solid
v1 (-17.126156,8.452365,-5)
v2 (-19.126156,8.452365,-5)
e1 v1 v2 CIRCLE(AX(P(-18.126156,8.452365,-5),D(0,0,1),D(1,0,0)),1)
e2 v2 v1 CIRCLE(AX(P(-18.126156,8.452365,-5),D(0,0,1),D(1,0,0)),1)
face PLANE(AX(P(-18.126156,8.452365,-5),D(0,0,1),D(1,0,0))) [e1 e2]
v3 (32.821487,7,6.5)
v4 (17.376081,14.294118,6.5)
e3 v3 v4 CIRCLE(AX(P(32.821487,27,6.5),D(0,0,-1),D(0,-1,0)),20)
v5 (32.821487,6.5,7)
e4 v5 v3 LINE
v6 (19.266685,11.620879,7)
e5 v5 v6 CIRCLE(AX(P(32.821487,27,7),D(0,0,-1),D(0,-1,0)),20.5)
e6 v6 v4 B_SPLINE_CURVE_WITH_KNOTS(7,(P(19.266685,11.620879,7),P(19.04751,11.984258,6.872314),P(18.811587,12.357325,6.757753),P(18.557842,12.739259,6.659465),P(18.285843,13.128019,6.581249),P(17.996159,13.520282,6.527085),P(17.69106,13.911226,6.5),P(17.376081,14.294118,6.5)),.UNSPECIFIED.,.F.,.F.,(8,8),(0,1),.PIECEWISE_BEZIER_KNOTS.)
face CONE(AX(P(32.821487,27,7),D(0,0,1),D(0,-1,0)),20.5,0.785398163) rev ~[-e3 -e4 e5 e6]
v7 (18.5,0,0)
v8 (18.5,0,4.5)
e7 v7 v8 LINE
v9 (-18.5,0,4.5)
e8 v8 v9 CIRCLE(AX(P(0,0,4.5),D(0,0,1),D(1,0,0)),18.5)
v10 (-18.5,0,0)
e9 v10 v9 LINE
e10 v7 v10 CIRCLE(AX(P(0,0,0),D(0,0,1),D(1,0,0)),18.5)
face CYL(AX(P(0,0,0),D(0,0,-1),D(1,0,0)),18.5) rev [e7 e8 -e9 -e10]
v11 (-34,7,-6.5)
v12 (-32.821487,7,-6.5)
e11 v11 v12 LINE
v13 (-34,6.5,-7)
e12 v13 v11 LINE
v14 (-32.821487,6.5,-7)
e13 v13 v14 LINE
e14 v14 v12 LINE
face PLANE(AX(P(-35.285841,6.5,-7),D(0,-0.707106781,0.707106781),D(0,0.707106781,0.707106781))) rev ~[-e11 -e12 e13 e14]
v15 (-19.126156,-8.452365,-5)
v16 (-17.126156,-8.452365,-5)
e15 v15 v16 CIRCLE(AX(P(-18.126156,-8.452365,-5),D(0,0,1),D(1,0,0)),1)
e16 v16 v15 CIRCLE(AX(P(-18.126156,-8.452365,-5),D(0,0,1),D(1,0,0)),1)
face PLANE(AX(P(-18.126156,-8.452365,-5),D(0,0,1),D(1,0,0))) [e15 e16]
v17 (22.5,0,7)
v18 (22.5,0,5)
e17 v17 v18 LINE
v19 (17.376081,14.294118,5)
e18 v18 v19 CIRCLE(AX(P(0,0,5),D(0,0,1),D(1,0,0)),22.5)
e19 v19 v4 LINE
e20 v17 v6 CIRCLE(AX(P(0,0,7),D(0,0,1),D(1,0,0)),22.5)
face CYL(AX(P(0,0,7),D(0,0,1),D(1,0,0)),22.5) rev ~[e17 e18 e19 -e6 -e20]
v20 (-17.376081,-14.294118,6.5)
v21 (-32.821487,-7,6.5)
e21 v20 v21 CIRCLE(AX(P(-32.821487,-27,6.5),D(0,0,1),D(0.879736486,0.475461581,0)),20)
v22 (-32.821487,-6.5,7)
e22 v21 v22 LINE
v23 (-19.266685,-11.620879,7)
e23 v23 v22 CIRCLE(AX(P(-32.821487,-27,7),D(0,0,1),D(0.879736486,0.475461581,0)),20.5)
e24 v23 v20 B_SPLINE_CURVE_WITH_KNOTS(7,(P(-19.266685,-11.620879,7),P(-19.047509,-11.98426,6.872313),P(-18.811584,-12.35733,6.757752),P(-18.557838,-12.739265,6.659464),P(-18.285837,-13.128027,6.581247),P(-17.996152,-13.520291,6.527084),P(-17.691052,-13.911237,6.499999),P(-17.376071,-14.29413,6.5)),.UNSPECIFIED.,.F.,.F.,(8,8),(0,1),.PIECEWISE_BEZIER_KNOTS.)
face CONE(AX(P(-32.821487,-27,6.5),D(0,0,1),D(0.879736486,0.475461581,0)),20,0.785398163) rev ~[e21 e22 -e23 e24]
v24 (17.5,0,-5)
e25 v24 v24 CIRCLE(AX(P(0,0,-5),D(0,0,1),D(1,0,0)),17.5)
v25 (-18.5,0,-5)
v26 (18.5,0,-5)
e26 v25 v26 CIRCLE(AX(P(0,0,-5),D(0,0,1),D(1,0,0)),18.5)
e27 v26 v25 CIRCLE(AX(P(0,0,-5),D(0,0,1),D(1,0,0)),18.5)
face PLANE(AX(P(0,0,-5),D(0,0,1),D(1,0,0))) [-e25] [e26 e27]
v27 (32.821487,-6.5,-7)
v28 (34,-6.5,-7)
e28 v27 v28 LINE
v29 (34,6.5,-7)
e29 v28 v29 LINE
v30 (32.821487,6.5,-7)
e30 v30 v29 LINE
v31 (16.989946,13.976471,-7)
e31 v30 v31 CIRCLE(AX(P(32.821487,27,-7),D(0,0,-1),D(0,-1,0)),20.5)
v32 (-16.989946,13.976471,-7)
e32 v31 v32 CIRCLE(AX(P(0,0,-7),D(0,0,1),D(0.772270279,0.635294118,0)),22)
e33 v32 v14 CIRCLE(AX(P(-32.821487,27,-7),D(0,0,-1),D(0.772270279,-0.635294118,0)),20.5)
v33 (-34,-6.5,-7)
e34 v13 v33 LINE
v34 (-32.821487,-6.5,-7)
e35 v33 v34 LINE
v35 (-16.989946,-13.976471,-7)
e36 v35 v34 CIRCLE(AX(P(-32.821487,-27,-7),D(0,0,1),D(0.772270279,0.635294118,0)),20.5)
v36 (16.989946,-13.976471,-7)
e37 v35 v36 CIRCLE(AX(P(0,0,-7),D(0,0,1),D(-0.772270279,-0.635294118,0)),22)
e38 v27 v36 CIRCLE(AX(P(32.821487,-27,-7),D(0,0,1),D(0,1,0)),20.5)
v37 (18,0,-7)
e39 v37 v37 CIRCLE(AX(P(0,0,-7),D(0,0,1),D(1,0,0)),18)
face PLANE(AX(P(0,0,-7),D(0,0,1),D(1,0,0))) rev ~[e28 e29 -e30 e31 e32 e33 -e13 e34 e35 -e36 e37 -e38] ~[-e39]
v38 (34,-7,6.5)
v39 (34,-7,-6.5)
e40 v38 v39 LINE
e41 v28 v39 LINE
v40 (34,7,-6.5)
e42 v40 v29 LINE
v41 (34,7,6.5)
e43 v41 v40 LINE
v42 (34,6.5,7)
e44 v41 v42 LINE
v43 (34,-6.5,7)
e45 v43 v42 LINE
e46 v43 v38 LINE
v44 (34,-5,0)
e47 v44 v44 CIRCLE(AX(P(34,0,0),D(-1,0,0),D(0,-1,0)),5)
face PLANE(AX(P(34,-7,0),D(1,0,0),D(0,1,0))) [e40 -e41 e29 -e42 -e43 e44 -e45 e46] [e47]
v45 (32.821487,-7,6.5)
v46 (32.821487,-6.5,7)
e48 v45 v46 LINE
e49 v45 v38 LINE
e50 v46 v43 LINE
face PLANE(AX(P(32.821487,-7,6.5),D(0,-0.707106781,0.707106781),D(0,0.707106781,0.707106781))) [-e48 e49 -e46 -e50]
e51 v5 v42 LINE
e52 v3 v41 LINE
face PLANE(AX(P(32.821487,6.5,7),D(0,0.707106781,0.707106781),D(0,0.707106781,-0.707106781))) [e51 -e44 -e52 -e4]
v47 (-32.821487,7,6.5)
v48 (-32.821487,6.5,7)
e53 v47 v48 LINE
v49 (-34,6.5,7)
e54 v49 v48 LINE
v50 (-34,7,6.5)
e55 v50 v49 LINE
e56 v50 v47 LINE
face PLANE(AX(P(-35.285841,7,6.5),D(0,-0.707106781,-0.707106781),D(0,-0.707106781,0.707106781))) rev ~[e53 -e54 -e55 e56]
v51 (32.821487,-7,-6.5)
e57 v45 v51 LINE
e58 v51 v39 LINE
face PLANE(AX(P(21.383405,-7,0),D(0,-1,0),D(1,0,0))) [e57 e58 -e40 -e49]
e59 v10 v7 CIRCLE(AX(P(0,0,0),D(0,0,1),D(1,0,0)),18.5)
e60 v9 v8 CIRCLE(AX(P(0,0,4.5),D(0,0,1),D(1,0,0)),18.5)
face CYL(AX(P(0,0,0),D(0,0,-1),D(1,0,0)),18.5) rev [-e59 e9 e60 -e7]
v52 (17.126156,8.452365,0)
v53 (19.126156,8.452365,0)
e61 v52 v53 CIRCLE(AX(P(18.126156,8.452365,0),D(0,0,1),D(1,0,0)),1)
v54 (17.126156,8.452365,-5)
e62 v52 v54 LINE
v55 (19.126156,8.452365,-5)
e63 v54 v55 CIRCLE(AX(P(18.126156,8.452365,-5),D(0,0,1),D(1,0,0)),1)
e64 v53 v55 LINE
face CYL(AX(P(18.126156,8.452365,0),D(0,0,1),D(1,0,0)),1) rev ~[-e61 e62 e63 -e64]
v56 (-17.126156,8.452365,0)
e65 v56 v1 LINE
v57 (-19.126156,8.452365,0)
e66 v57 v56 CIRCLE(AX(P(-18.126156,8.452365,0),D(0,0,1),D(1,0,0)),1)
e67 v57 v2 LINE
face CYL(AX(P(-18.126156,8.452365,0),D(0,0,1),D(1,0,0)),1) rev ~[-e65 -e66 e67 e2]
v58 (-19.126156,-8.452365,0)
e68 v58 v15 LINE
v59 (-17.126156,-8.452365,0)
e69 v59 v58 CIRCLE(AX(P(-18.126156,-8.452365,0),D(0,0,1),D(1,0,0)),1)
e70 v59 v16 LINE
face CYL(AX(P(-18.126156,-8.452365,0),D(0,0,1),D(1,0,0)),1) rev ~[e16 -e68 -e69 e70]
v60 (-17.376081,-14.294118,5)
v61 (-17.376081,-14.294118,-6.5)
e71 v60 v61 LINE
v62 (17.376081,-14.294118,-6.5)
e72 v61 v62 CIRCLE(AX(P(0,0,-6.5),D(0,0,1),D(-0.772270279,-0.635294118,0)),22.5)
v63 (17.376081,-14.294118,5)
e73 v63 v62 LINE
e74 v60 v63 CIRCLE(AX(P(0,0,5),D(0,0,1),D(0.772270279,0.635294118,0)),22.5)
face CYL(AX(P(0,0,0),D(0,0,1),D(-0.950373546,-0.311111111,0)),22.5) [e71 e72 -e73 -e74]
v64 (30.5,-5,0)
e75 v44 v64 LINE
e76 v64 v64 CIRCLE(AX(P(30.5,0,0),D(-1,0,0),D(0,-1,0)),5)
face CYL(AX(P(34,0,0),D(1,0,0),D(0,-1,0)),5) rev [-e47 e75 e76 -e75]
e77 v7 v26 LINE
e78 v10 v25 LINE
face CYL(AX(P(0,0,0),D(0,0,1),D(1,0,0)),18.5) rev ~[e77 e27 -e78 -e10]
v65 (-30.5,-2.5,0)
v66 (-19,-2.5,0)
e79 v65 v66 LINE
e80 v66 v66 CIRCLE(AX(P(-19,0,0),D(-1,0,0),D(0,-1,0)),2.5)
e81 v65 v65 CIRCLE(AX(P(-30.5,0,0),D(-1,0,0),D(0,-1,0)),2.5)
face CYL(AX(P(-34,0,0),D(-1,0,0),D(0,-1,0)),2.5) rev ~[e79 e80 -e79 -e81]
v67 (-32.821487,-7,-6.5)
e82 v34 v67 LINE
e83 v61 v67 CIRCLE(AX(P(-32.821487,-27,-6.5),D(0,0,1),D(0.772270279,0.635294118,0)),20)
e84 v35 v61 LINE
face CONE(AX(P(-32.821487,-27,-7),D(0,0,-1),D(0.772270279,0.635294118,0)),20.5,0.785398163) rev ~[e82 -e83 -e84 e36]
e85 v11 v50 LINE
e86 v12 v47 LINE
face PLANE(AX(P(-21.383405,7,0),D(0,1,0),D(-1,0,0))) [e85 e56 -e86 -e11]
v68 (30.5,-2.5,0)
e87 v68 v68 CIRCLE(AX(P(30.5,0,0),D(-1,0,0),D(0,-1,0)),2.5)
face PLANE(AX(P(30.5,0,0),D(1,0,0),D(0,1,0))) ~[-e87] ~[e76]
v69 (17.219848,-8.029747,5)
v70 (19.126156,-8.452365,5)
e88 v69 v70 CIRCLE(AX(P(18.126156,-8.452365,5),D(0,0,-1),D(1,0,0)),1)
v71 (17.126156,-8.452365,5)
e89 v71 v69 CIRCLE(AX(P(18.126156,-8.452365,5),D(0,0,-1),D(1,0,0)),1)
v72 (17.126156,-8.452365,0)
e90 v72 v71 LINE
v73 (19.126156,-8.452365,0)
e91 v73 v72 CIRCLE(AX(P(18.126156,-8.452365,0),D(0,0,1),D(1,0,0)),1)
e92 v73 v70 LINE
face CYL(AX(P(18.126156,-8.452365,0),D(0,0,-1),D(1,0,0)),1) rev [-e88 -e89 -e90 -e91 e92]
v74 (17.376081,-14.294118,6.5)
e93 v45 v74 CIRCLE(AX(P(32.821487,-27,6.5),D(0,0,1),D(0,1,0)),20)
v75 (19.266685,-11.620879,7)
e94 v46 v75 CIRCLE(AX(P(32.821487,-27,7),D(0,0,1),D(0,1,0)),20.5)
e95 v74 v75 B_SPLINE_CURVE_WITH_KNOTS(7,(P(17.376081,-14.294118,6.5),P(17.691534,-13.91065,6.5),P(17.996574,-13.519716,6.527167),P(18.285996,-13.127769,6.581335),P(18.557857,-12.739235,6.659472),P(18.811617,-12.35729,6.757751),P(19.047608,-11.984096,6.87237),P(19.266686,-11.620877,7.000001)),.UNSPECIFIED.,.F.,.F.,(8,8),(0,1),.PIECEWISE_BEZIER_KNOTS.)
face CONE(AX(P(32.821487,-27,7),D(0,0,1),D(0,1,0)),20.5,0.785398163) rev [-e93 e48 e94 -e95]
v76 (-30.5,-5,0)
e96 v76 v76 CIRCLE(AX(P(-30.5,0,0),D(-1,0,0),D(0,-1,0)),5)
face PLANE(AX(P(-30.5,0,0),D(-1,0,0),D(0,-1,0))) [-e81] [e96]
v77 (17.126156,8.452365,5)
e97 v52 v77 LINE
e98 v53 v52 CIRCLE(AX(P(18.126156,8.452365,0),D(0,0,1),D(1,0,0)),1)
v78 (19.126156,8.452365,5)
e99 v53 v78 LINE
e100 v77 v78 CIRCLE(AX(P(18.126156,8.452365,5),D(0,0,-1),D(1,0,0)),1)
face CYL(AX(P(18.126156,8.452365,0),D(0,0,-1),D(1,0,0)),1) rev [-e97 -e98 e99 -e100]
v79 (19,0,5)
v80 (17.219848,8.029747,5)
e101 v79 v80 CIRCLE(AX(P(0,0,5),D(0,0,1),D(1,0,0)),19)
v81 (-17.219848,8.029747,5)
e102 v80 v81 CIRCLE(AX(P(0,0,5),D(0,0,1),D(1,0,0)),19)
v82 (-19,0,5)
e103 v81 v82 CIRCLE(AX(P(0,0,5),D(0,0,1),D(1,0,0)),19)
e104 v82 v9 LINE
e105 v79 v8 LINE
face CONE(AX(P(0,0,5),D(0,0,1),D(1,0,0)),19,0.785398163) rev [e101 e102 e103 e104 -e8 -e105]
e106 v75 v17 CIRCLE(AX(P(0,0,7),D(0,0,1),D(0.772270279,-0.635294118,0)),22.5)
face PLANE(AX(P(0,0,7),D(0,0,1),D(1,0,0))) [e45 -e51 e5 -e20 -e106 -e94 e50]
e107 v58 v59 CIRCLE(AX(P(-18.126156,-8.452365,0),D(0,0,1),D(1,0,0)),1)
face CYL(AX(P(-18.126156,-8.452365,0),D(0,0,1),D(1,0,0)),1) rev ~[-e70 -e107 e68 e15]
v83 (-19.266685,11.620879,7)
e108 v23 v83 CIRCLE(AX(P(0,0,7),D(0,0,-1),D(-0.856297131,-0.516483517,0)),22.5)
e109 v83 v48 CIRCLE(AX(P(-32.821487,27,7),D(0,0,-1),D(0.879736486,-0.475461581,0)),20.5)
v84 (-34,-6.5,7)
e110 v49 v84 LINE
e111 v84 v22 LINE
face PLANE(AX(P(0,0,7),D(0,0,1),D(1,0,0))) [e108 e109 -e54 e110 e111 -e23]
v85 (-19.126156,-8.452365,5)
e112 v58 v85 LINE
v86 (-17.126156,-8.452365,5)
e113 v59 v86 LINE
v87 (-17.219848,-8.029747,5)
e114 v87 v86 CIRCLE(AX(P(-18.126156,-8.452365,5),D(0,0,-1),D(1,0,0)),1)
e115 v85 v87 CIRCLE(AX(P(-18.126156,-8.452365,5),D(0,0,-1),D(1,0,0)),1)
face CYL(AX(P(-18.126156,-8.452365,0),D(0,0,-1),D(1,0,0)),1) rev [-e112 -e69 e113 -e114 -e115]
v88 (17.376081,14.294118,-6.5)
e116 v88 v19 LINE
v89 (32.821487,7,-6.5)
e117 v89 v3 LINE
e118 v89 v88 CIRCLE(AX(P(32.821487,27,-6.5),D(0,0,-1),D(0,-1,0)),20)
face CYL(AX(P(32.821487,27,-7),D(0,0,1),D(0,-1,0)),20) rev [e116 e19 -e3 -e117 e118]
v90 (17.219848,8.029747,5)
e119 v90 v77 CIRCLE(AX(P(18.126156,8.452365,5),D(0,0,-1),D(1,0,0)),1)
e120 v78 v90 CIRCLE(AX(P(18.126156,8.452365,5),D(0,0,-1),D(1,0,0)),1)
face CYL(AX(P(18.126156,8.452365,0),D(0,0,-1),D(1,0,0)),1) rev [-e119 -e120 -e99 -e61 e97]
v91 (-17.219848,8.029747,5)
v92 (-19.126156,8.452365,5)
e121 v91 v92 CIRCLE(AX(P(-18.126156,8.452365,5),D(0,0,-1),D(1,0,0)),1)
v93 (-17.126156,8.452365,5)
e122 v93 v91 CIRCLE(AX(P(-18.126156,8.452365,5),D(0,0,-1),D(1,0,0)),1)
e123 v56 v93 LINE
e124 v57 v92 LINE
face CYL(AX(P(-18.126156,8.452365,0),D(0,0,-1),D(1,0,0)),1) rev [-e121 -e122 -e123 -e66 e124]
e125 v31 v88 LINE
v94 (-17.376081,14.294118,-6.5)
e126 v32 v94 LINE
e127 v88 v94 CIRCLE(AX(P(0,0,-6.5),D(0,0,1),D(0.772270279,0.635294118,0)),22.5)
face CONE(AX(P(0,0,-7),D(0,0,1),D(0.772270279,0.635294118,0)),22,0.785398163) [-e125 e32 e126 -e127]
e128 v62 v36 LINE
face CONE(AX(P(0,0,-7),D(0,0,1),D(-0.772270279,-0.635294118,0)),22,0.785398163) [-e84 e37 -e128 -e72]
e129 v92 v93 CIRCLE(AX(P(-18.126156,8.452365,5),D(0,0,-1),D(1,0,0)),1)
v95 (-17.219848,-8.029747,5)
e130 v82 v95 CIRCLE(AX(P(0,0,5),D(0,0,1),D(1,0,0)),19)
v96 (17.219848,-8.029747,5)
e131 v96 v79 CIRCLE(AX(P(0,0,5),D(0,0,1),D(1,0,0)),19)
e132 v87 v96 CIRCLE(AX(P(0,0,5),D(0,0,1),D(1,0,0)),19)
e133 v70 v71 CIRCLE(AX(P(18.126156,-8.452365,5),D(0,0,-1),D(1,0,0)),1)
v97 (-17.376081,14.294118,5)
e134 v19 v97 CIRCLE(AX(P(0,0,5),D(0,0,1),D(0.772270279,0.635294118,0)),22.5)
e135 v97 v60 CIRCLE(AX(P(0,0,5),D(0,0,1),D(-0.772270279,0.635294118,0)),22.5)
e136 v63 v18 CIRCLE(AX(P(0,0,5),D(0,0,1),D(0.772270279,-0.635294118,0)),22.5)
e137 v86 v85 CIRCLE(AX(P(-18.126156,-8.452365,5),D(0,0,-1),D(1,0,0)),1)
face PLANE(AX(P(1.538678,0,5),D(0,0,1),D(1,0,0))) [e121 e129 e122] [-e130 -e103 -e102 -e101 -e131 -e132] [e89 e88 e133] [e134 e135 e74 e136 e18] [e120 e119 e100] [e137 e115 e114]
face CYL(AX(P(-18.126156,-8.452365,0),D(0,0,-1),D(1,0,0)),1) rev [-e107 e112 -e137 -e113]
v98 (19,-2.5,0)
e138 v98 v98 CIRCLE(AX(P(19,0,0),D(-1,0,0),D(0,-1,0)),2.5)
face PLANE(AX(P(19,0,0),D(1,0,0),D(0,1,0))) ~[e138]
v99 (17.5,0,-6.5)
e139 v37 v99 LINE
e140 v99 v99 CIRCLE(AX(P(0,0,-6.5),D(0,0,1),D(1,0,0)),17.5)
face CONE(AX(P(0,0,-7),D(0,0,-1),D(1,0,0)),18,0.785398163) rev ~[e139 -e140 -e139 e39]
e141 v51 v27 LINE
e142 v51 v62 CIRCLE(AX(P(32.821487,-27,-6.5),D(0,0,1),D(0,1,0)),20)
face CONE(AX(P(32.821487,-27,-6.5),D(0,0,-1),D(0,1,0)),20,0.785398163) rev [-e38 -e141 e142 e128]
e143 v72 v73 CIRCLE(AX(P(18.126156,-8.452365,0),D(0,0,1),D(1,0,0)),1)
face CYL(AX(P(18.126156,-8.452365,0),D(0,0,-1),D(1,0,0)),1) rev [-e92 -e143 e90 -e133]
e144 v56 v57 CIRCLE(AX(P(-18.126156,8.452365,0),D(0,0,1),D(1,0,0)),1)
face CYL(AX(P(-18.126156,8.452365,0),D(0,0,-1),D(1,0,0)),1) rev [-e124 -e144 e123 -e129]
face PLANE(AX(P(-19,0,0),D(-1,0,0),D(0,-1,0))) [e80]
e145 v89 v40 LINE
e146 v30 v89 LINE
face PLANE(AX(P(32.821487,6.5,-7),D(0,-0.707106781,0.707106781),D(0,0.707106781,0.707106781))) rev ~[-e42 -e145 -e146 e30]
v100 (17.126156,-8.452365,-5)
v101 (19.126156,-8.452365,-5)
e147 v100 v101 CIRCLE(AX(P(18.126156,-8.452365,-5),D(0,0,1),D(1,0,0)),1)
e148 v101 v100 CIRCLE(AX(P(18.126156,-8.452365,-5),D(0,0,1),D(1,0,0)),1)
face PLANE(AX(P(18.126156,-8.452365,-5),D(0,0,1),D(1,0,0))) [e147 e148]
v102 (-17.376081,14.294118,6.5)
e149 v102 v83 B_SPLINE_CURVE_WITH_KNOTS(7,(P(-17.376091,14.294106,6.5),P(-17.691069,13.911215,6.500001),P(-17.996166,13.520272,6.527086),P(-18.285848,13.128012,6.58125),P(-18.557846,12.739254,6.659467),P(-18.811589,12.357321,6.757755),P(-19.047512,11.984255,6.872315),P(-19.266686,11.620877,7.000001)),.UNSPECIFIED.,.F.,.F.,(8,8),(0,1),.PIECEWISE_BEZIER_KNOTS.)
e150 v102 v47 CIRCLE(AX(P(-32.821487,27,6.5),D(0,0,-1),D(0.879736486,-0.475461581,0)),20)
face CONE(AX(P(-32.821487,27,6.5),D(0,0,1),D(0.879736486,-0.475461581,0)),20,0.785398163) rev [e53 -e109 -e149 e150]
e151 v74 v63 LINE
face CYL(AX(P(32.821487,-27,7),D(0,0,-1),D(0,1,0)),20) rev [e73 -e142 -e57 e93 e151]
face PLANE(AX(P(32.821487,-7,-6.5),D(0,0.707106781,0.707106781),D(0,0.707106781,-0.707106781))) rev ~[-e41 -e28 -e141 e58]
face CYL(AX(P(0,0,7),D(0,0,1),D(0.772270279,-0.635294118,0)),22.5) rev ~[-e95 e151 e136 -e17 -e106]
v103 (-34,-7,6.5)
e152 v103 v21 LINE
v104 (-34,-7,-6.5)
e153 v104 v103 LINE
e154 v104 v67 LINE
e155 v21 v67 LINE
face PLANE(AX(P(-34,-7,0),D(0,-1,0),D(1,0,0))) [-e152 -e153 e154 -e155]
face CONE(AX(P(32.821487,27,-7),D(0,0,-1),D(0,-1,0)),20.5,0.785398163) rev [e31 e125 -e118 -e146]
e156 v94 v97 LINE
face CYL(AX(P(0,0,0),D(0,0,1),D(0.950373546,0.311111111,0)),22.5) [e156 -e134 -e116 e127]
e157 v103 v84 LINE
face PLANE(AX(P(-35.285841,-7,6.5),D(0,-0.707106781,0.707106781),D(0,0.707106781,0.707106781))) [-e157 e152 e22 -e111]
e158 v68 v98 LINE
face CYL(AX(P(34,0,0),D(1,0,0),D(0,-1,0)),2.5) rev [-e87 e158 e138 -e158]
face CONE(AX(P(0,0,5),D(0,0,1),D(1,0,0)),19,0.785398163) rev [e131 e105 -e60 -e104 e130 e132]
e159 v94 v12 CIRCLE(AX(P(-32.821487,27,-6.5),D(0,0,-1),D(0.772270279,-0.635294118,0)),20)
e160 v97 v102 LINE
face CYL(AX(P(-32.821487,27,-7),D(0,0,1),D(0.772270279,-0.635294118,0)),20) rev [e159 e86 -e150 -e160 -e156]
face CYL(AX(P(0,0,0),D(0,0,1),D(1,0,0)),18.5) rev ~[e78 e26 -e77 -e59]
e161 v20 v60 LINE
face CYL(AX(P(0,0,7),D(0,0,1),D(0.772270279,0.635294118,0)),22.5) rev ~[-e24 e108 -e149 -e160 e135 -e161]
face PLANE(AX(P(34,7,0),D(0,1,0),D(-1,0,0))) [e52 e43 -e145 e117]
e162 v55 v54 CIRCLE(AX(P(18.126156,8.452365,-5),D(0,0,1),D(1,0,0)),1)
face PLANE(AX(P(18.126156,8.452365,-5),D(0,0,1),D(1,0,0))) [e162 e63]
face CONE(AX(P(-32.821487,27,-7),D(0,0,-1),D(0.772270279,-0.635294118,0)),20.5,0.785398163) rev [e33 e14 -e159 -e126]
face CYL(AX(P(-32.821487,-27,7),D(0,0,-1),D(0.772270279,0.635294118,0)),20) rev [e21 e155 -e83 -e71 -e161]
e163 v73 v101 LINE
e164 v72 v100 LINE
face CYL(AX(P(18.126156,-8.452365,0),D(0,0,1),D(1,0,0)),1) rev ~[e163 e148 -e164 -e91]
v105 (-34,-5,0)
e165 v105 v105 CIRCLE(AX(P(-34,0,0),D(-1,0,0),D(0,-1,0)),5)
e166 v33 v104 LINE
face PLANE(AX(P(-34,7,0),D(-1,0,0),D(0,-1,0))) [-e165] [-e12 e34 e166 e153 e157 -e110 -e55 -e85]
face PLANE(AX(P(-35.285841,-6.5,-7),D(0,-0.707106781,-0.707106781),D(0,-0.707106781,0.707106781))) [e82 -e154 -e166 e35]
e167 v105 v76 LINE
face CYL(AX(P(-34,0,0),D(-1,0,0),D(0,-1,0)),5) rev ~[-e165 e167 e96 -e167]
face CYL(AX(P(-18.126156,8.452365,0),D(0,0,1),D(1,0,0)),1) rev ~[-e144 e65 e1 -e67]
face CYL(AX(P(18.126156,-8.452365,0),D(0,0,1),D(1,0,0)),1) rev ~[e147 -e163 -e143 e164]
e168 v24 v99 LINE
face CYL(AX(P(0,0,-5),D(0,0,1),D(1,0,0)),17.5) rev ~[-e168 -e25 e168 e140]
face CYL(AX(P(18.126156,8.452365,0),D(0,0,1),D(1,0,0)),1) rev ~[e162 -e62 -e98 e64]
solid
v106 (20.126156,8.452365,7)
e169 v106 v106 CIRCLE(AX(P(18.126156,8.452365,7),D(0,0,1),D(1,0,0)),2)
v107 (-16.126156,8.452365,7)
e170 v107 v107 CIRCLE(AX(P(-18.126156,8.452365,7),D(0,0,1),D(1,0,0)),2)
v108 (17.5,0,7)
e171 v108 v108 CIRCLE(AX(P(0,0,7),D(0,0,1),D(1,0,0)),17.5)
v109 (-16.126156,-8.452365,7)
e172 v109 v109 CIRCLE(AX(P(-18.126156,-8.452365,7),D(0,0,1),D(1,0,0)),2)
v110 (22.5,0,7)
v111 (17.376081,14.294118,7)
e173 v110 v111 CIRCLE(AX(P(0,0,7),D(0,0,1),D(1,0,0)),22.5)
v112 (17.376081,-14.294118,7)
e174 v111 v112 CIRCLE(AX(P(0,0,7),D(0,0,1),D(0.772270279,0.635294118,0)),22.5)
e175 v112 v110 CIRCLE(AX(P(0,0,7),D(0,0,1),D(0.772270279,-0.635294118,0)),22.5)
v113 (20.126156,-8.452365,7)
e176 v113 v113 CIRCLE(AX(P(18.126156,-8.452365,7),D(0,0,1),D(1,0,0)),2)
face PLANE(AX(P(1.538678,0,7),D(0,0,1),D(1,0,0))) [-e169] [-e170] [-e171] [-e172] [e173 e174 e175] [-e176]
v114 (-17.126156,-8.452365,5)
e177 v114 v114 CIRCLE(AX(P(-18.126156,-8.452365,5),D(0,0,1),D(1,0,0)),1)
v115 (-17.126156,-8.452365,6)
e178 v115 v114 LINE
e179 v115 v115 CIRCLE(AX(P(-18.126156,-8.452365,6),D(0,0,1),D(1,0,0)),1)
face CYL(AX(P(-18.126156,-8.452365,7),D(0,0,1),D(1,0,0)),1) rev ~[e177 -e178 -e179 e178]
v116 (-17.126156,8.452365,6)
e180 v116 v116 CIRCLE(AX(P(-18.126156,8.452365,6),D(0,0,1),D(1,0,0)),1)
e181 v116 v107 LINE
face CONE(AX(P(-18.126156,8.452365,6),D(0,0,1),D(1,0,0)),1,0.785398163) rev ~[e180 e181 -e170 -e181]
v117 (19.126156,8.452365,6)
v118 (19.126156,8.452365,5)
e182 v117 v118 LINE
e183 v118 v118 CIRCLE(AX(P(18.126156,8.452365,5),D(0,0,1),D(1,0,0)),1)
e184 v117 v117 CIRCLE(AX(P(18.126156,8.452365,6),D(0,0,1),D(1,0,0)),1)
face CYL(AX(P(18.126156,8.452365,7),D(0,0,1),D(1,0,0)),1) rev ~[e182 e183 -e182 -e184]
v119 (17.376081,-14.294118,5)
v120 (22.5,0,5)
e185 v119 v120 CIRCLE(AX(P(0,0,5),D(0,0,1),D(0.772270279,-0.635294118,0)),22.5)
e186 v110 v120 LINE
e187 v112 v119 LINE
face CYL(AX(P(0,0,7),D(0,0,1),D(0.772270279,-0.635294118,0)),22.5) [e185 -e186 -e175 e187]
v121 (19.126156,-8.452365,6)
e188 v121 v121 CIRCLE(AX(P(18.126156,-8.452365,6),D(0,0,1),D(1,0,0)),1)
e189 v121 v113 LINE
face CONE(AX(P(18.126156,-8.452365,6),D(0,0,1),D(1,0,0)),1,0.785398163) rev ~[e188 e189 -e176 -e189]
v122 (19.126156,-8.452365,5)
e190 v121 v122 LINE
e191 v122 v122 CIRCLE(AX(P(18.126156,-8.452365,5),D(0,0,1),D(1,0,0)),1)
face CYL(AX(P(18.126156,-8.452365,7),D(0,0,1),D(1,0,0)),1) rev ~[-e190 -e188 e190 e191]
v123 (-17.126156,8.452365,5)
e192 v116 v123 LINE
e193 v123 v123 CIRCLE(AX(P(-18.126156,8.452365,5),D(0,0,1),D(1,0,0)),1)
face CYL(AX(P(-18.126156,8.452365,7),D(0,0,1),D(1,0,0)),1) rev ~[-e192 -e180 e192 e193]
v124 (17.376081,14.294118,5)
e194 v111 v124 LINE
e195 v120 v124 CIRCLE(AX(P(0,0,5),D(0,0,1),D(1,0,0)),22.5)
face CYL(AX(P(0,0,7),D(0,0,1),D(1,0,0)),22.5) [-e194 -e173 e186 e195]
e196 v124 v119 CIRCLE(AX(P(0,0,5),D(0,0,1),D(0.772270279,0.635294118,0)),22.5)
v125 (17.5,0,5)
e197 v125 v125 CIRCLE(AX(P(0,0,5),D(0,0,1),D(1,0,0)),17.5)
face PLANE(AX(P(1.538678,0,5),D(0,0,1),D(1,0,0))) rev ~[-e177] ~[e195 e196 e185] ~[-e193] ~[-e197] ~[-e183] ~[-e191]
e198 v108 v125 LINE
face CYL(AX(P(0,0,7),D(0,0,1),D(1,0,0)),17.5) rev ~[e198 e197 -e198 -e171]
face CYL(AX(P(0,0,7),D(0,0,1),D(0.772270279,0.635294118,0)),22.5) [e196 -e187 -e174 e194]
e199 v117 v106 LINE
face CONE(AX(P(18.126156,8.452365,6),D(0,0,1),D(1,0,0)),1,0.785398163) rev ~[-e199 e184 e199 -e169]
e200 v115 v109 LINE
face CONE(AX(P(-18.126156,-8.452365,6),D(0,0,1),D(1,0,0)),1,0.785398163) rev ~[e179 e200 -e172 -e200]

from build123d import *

# Parameters (mm, degrees)
F0_R          = 1
F0_R_2        = 18.5
F1_DEPTH      = 7
F1_DEPTH_BACK = 7
F2_START      = -5
F0_R_3        = 17.5
F2_DEPTH      = 2
F3_R          = 20
F4_R          = 1
F4_R_2        = 18.5
F5_DEPTH      = 2
F4_R_3        = 17.5
F6_DEPTH      = 2
F7_T1_DEPTH   = 2.4643546294
F7_T3_DEPTH   = 2.4643546294
F7_T6_ANGLE   = 61.6105922117
F7_T8_ANGLE   = 61.6105922117
F7_T10_ANGLE  = 61.6105922117
F7_T12_ANGLE  = 61.6105922117
F7_T14_ANGLE  = 50.5581979624
F7_T16_ANGLE  = 101.1163959248
F7_T22_ANGLE  = 50.5581979624
F7_T24_ANGLE  = 50.5581979624
F7_T26_ANGLE  = 101.1163959248
F7_T28_ANGLE  = 50.5581979624
F8_SIZE       = 1
F9_R          = 5
F9_R_2        = 2.5
F10_DEPTH     = 3.5
F11_DEPTH     = 15


# Not quite as in the source:
# - a fillet or chamfer that OpenCascade refuses, or shapes differently, is made with other operations: its cross-section is extruded or revolved along the edge and cut away or added


with BuildPart() as f1:
    # F0 (on Top) → F1 (new body, two sides)
    with BuildSketch(Plane.XY) as f1_sk:
        with BuildLine():
            Line((34, 7), (21.3834047803, 7))
            ThreePointArc((21.3834047803, 7), (0, 22.5), (-21.3834047803, 7))
            Line((-21.3834047803, 7), (-34, 7))
            Line((-34, 7), (-34, -7))
            Line((-34, -7), (-21.3834047803, -7))
            ThreePointArc((-21.3834047803, -7), (0, -22.5), (21.3834047803, -7))
            Line((21.3834047803, -7), (34, -7))
            Line((34, -7), (34, 7))
        make_face()
        with Locations((-18.1261557407, -8.4523652348)):
            Circle(F0_R, mode=Mode.SUBTRACT)
        with Locations((18.1261557407, -8.4523652348)):
            Circle(F0_R, mode=Mode.SUBTRACT)
        with Locations((-18.1261557407, 8.4523652348)):
            Circle(F0_R, mode=Mode.SUBTRACT)
        Circle(F0_R_2, mode=Mode.SUBTRACT)
        with Locations((18.1261557407, 8.4523652348)):
            Circle(F0_R, mode=Mode.SUBTRACT)
    extrude(amount=F1_DEPTH)
    extrude(f1_sk.sketch, amount=-F1_DEPTH_BACK)

    # F0 (on Top) → F2 (join)
    with BuildSketch(Plane.XY.offset(F2_START)):
        Circle(F0_R_2)
        Circle(F0_R_3, mode=Mode.SUBTRACT)
        with Locations((18.1261557407, 8.4523652348)):
            Circle(F0_R)
        with Locations((18.1261557407, -8.4523652348)):
            Circle(F0_R)
        with Locations((-18.1261557407, -8.4523652348)):
            Circle(F0_R)
        with Locations((-18.1261557407, 8.4523652348)):
            Circle(F0_R)
    extrude(amount=-F2_DEPTH)

    # F3
    f3_edges = [f1.edges().sort_by_distance(p)[0] for p in [
        (21.383405, 7, 0),
        (21.383405, -7, 0),
        (-21.383405, -7, 0),
        (-21.383405, 7, 0),
    ]]
    fillet(f3_edges, radius=F3_R)

    # F4 (on face) → F5 (cut)
    with BuildSketch(Plane.XY.offset(7)):
        with BuildLine():
            ThreePointArc((17.3760812812, -14.2941176471), (21.1803190348, -7.5923702219), (22.5, 0))
            ThreePointArc((22.5, 0), (21.1803190348, 7.5923702219), (17.3760812812, 14.2941176471))
            ThreePointArc((17.3760812812, 14.2941176471), (0, 22.5), (-17.3760812812, 14.2941176471))
            ThreePointArc((-17.3760812812, 14.2941176471), (-22.5, 0), (-17.3760812812, -14.2941176471))
            ThreePointArc((-17.3760812812, -14.2941176471), (0, -22.5), (17.3760812812, -14.2941176471))
        make_face()
        with Locations((-18.1261557407, -8.4523652348)):
            Circle(F4_R, mode=Mode.SUBTRACT)
        with Locations((18.1261557407, -8.4523652348)):
            Circle(F4_R, mode=Mode.SUBTRACT)
        with Locations((-18.1261557407, 8.4523652348)):
            Circle(F4_R, mode=Mode.SUBTRACT)
        Circle(F4_R_2, mode=Mode.SUBTRACT)
        with Locations((18.1261557407, 8.4523652348)):
            Circle(F4_R, mode=Mode.SUBTRACT)
        with Locations((18.1261557407, -8.4523652348)):
            Circle(F4_R)
        with Locations((18.1261557407, 8.4523652348)):
            Circle(F4_R)
        with Locations((-18.1261557407, 8.4523652348)):
            Circle(F4_R)
        with Locations((-18.1261557407, -8.4523652348)):
            Circle(F4_R)
    extrude(amount=-F5_DEPTH, mode=Mode.SUBTRACT)

    # F7: chamfer of 0.5 on 8 edges, made by hand

    # F7_s2 → F7_t1 (cut)
    with BuildSketch(Plane.YZ.offset(-35.285841494)):
        Polygon((6.5, -7), (7, -6.5), (7, -7), align=None)
        Polygon((-6.5, -7), (-7, -6.5), (-7, -7), align=None)
        Polygon((7, 6.5), (6.5, 7), (7, 7), align=None)
        Polygon((-7, 6.5), (-6.5, 7), (-7, 7), align=None)
    extrude(amount=F7_T1_DEPTH, mode=Mode.SUBTRACT)

    # F7_s4 → F7_t3 (cut)
    with BuildSketch(Plane.YZ.offset(32.8214868646)):
        Polygon((6.5, -7), (7, -6.5), (7, -7), align=None)
        Polygon((-7, -6.5), (-6.5, -7), (-7, -7), align=None)
        Polygon((6.5, 7), (7, 6.5), (7, 7), align=None)
        Polygon((-7, 6.5), (-6.5, 7), (-7, 7), align=None)
    extrude(amount=F7_T3_DEPTH, mode=Mode.SUBTRACT)

    # F7_s5 → F7_t6 (revolve, cut)
    with BuildSketch(Plane(origin=(3.873837059, -7.1676786017, 0), x_dir=(0, 0, 1), z_dir=(0.4754615812, -0.879736486, 0))):
        Polygon((6.5, 21.7117222121), (7, 21.2117222121), (7, 21.7117222121), align=None)
    revolve(axis=Axis((-32.8214868646, -27, 7), (0, 0, 1)), revolution_arc=F7_T6_ANGLE, mode=Mode.SUBTRACT)

    # F7_s7 → F7_t8 (revolve, cut)
    with BuildSketch(Plane(origin=(3.873837059, 7.1676786017, 0), x_dir=(0, 0, 1), z_dir=(0.4754615812, 0.879736486, 0))):
        Polygon((6.5, -21.7117222121), (7, -21.2117222121), (7, -21.7117222121), align=None)
    revolve(axis=Axis((-32.8214868646, 27, 7), (0, 0, -1)), revolution_arc=F7_T8_ANGLE, mode=Mode.SUBTRACT)

    # F7_s9 → F7_t10 (revolve, cut)
    with BuildSketch(Plane.YZ.offset(32.8214868646)):
        Polygon((-6.5, 7), (-7, 6.5), (-7, 7), align=None)
    revolve(axis=Axis((32.8214868646, -27, 7), (0, 0, 1)), revolution_arc=F7_T10_ANGLE, mode=Mode.SUBTRACT)

    # F7_s11 → F7_t12 (revolve, cut)
    with BuildSketch(Plane.YZ.offset(32.8214868646)):
        Polygon((6.5, 7), (7, 6.5), (7, 7), align=None)
    revolve(axis=Axis((32.8214868646, 27, 7), (0, 0, -1)), revolution_arc=F7_T12_ANGLE, mode=Mode.SUBTRACT)

    # F7_s13 → F7_t14 (revolve, cut)
    with BuildSketch(Plane.YZ.offset(32.8214868646)):
        Polygon((-7, -6.5), (-6.5, -7), (-7, -7), align=None)
    revolve(axis=Axis((32.8214868646, -27, -7), (0, 0, 1)), revolution_arc=F7_T14_ANGLE, mode=Mode.SUBTRACT)

    # F7_s15 → F7_t16 (revolve, cut)
    with BuildSketch(Plane(origin=(0, 0, 0), x_dir=(0, 0, 1), z_dir=(0.6352941176, -0.7722702792, 0))):
        Polygon((-7, -22), (-6.5, -22.5), (-7, -22.5), align=None)
    revolve(axis=Axis((0, 0, -7), (0, 0, 1)), revolution_arc=F7_T16_ANGLE, mode=Mode.SUBTRACT)

    # F7_s17 → F7_t18 (revolve, cut)
    with BuildSketch(Plane.XZ):
        Polygon((18, -7), (17.5, -6.5), (17.5, -7), align=None)
    revolve(axis=Axis((0, 0, -7), (0, 0, 1)), mode=Mode.SUBTRACT)

    # F7_s19 → F7_t20 (revolve, cut)
    with BuildSketch(Plane.XZ):
        Polygon((19, 5), (18.5, 4.5), (18.5, 5), align=None)
    revolve(axis=Axis((0, 0, 5), (0, 0, 1)), mode=Mode.SUBTRACT)

    # F7_s21 → F7_t22 (revolve, cut)
    with BuildSketch(Plane.YZ.offset(32.8214868646)):
        Polygon((6.5, -7), (7, -6.5), (7, -7), align=None)
    revolve(axis=Axis((32.8214868646, 27, -7), (0, 0, -1)), revolution_arc=F7_T22_ANGLE, mode=Mode.SUBTRACT)

    # F7_s23 → F7_t24 (revolve, cut)
    with BuildSketch(Plane(origin=(0, 0, 0), x_dir=(0, 0, 1), z_dir=(0.6352941176, 0.7722702792, 0))):
        Polygon((-7, -22), (-6.5, -22.5), (-7, -22.5), align=None)
    revolve(axis=Axis((-32.8214868646, 27, -7), (0, 0, -1)), revolution_arc=F7_T24_ANGLE, mode=Mode.SUBTRACT)

    # F7_s25 → F7_t26 (revolve, cut)
    with BuildSketch(Plane(origin=(0, 0, 0), x_dir=(0, 0, 1), z_dir=(-0.6352941176, 0.7722702792, 0))):
        Polygon((-7, -22), (-6.5, -22.5), (-7, -22.5), align=None)
    revolve(axis=Axis((0, 0, -7), (0, 0, 1)), revolution_arc=F7_T26_ANGLE, mode=Mode.SUBTRACT)

    # F7_s27 → F7_t28 (revolve, cut)
    with BuildSketch(Plane(origin=(0, 0, 0), x_dir=(0, 0, 1), z_dir=(0.6352941176, -0.7722702792, 0))):
        Polygon((-7, 22), (-6.5, 22.5), (-7, 22.5), align=None)
    revolve(axis=Axis((-32.8214868646, -27, -7), (0, 0, 1)), revolution_arc=F7_T28_ANGLE, mode=Mode.SUBTRACT)

    # F9 (on face) → F10 (cut)
    with BuildSketch(Plane(origin=(-34, 0, 0), x_dir=(0, -1, 0), z_dir=(-1, 0, 0))):
        Circle(F9_R)
        Circle(F9_R_2, mode=Mode.SUBTRACT)
        Circle(F9_R_2)
    extrude(amount=-F10_DEPTH, mode=Mode.SUBTRACT)

    # F9 (on face) → F11 (cut)
    with BuildSketch(Plane(origin=(-34, 0, 0), x_dir=(0, -1, 0), z_dir=(-1, 0, 0))):
        Circle(F9_R_2)
    extrude(amount=-F11_DEPTH, mode=Mode.SUBTRACT)

    # F12: F1 across plane


with BuildPart() as f6:
    # F4 (on face) → F6 (new body)
    with BuildSketch(Plane.XY.offset(7)):
        with BuildLine():
            ThreePointArc((17.3760812812, -14.2941176471), (21.1803190348, -7.5923702219), (22.5, 0))
            ThreePointArc((22.5, 0), (21.1803190348, 7.5923702219), (17.3760812812, 14.2941176471))
            ThreePointArc((17.3760812812, 14.2941176471), (0, 22.5), (-17.3760812812, 14.2941176471))
            ThreePointArc((-17.3760812812, 14.2941176471), (-22.5, 0), (-17.3760812812, -14.2941176471))
            ThreePointArc((-17.3760812812, -14.2941176471), (0, -22.5), (17.3760812812, -14.2941176471))
        make_face()
        with Locations((-18.1261557407, -8.4523652348)):
            Circle(F4_R, mode=Mode.SUBTRACT)
        with Locations((18.1261557407, -8.4523652348)):
            Circle(F4_R, mode=Mode.SUBTRACT)
        with Locations((-18.1261557407, 8.4523652348)):
            Circle(F4_R, mode=Mode.SUBTRACT)
        Circle(F4_R_2, mode=Mode.SUBTRACT)
        with Locations((18.1261557407, 8.4523652348)):
            Circle(F4_R, mode=Mode.SUBTRACT)
        Circle(F4_R_2)
        Circle(F4_R_3, mode=Mode.SUBTRACT)
    extrude(amount=-F6_DEPTH)

    # F8
    f8_edges = [f6.edges().sort_by_distance(p)[0] for p in [
        (17.126156, 8.452365, 7),
        (17.126156, -8.452365, 7),
        (-19.126156, -8.452365, 7),
        (-19.126156, 8.452365, 7),
    ]]
    chamfer(f8_edges, length=F8_SIZE)


with BuildPart() as f1_1:
    add(f1.part)
    add(f1.part.mirror(Plane.YZ), mode=Mode.INTERSECT)


solid = Compound([f6.part, f1_1.part])
